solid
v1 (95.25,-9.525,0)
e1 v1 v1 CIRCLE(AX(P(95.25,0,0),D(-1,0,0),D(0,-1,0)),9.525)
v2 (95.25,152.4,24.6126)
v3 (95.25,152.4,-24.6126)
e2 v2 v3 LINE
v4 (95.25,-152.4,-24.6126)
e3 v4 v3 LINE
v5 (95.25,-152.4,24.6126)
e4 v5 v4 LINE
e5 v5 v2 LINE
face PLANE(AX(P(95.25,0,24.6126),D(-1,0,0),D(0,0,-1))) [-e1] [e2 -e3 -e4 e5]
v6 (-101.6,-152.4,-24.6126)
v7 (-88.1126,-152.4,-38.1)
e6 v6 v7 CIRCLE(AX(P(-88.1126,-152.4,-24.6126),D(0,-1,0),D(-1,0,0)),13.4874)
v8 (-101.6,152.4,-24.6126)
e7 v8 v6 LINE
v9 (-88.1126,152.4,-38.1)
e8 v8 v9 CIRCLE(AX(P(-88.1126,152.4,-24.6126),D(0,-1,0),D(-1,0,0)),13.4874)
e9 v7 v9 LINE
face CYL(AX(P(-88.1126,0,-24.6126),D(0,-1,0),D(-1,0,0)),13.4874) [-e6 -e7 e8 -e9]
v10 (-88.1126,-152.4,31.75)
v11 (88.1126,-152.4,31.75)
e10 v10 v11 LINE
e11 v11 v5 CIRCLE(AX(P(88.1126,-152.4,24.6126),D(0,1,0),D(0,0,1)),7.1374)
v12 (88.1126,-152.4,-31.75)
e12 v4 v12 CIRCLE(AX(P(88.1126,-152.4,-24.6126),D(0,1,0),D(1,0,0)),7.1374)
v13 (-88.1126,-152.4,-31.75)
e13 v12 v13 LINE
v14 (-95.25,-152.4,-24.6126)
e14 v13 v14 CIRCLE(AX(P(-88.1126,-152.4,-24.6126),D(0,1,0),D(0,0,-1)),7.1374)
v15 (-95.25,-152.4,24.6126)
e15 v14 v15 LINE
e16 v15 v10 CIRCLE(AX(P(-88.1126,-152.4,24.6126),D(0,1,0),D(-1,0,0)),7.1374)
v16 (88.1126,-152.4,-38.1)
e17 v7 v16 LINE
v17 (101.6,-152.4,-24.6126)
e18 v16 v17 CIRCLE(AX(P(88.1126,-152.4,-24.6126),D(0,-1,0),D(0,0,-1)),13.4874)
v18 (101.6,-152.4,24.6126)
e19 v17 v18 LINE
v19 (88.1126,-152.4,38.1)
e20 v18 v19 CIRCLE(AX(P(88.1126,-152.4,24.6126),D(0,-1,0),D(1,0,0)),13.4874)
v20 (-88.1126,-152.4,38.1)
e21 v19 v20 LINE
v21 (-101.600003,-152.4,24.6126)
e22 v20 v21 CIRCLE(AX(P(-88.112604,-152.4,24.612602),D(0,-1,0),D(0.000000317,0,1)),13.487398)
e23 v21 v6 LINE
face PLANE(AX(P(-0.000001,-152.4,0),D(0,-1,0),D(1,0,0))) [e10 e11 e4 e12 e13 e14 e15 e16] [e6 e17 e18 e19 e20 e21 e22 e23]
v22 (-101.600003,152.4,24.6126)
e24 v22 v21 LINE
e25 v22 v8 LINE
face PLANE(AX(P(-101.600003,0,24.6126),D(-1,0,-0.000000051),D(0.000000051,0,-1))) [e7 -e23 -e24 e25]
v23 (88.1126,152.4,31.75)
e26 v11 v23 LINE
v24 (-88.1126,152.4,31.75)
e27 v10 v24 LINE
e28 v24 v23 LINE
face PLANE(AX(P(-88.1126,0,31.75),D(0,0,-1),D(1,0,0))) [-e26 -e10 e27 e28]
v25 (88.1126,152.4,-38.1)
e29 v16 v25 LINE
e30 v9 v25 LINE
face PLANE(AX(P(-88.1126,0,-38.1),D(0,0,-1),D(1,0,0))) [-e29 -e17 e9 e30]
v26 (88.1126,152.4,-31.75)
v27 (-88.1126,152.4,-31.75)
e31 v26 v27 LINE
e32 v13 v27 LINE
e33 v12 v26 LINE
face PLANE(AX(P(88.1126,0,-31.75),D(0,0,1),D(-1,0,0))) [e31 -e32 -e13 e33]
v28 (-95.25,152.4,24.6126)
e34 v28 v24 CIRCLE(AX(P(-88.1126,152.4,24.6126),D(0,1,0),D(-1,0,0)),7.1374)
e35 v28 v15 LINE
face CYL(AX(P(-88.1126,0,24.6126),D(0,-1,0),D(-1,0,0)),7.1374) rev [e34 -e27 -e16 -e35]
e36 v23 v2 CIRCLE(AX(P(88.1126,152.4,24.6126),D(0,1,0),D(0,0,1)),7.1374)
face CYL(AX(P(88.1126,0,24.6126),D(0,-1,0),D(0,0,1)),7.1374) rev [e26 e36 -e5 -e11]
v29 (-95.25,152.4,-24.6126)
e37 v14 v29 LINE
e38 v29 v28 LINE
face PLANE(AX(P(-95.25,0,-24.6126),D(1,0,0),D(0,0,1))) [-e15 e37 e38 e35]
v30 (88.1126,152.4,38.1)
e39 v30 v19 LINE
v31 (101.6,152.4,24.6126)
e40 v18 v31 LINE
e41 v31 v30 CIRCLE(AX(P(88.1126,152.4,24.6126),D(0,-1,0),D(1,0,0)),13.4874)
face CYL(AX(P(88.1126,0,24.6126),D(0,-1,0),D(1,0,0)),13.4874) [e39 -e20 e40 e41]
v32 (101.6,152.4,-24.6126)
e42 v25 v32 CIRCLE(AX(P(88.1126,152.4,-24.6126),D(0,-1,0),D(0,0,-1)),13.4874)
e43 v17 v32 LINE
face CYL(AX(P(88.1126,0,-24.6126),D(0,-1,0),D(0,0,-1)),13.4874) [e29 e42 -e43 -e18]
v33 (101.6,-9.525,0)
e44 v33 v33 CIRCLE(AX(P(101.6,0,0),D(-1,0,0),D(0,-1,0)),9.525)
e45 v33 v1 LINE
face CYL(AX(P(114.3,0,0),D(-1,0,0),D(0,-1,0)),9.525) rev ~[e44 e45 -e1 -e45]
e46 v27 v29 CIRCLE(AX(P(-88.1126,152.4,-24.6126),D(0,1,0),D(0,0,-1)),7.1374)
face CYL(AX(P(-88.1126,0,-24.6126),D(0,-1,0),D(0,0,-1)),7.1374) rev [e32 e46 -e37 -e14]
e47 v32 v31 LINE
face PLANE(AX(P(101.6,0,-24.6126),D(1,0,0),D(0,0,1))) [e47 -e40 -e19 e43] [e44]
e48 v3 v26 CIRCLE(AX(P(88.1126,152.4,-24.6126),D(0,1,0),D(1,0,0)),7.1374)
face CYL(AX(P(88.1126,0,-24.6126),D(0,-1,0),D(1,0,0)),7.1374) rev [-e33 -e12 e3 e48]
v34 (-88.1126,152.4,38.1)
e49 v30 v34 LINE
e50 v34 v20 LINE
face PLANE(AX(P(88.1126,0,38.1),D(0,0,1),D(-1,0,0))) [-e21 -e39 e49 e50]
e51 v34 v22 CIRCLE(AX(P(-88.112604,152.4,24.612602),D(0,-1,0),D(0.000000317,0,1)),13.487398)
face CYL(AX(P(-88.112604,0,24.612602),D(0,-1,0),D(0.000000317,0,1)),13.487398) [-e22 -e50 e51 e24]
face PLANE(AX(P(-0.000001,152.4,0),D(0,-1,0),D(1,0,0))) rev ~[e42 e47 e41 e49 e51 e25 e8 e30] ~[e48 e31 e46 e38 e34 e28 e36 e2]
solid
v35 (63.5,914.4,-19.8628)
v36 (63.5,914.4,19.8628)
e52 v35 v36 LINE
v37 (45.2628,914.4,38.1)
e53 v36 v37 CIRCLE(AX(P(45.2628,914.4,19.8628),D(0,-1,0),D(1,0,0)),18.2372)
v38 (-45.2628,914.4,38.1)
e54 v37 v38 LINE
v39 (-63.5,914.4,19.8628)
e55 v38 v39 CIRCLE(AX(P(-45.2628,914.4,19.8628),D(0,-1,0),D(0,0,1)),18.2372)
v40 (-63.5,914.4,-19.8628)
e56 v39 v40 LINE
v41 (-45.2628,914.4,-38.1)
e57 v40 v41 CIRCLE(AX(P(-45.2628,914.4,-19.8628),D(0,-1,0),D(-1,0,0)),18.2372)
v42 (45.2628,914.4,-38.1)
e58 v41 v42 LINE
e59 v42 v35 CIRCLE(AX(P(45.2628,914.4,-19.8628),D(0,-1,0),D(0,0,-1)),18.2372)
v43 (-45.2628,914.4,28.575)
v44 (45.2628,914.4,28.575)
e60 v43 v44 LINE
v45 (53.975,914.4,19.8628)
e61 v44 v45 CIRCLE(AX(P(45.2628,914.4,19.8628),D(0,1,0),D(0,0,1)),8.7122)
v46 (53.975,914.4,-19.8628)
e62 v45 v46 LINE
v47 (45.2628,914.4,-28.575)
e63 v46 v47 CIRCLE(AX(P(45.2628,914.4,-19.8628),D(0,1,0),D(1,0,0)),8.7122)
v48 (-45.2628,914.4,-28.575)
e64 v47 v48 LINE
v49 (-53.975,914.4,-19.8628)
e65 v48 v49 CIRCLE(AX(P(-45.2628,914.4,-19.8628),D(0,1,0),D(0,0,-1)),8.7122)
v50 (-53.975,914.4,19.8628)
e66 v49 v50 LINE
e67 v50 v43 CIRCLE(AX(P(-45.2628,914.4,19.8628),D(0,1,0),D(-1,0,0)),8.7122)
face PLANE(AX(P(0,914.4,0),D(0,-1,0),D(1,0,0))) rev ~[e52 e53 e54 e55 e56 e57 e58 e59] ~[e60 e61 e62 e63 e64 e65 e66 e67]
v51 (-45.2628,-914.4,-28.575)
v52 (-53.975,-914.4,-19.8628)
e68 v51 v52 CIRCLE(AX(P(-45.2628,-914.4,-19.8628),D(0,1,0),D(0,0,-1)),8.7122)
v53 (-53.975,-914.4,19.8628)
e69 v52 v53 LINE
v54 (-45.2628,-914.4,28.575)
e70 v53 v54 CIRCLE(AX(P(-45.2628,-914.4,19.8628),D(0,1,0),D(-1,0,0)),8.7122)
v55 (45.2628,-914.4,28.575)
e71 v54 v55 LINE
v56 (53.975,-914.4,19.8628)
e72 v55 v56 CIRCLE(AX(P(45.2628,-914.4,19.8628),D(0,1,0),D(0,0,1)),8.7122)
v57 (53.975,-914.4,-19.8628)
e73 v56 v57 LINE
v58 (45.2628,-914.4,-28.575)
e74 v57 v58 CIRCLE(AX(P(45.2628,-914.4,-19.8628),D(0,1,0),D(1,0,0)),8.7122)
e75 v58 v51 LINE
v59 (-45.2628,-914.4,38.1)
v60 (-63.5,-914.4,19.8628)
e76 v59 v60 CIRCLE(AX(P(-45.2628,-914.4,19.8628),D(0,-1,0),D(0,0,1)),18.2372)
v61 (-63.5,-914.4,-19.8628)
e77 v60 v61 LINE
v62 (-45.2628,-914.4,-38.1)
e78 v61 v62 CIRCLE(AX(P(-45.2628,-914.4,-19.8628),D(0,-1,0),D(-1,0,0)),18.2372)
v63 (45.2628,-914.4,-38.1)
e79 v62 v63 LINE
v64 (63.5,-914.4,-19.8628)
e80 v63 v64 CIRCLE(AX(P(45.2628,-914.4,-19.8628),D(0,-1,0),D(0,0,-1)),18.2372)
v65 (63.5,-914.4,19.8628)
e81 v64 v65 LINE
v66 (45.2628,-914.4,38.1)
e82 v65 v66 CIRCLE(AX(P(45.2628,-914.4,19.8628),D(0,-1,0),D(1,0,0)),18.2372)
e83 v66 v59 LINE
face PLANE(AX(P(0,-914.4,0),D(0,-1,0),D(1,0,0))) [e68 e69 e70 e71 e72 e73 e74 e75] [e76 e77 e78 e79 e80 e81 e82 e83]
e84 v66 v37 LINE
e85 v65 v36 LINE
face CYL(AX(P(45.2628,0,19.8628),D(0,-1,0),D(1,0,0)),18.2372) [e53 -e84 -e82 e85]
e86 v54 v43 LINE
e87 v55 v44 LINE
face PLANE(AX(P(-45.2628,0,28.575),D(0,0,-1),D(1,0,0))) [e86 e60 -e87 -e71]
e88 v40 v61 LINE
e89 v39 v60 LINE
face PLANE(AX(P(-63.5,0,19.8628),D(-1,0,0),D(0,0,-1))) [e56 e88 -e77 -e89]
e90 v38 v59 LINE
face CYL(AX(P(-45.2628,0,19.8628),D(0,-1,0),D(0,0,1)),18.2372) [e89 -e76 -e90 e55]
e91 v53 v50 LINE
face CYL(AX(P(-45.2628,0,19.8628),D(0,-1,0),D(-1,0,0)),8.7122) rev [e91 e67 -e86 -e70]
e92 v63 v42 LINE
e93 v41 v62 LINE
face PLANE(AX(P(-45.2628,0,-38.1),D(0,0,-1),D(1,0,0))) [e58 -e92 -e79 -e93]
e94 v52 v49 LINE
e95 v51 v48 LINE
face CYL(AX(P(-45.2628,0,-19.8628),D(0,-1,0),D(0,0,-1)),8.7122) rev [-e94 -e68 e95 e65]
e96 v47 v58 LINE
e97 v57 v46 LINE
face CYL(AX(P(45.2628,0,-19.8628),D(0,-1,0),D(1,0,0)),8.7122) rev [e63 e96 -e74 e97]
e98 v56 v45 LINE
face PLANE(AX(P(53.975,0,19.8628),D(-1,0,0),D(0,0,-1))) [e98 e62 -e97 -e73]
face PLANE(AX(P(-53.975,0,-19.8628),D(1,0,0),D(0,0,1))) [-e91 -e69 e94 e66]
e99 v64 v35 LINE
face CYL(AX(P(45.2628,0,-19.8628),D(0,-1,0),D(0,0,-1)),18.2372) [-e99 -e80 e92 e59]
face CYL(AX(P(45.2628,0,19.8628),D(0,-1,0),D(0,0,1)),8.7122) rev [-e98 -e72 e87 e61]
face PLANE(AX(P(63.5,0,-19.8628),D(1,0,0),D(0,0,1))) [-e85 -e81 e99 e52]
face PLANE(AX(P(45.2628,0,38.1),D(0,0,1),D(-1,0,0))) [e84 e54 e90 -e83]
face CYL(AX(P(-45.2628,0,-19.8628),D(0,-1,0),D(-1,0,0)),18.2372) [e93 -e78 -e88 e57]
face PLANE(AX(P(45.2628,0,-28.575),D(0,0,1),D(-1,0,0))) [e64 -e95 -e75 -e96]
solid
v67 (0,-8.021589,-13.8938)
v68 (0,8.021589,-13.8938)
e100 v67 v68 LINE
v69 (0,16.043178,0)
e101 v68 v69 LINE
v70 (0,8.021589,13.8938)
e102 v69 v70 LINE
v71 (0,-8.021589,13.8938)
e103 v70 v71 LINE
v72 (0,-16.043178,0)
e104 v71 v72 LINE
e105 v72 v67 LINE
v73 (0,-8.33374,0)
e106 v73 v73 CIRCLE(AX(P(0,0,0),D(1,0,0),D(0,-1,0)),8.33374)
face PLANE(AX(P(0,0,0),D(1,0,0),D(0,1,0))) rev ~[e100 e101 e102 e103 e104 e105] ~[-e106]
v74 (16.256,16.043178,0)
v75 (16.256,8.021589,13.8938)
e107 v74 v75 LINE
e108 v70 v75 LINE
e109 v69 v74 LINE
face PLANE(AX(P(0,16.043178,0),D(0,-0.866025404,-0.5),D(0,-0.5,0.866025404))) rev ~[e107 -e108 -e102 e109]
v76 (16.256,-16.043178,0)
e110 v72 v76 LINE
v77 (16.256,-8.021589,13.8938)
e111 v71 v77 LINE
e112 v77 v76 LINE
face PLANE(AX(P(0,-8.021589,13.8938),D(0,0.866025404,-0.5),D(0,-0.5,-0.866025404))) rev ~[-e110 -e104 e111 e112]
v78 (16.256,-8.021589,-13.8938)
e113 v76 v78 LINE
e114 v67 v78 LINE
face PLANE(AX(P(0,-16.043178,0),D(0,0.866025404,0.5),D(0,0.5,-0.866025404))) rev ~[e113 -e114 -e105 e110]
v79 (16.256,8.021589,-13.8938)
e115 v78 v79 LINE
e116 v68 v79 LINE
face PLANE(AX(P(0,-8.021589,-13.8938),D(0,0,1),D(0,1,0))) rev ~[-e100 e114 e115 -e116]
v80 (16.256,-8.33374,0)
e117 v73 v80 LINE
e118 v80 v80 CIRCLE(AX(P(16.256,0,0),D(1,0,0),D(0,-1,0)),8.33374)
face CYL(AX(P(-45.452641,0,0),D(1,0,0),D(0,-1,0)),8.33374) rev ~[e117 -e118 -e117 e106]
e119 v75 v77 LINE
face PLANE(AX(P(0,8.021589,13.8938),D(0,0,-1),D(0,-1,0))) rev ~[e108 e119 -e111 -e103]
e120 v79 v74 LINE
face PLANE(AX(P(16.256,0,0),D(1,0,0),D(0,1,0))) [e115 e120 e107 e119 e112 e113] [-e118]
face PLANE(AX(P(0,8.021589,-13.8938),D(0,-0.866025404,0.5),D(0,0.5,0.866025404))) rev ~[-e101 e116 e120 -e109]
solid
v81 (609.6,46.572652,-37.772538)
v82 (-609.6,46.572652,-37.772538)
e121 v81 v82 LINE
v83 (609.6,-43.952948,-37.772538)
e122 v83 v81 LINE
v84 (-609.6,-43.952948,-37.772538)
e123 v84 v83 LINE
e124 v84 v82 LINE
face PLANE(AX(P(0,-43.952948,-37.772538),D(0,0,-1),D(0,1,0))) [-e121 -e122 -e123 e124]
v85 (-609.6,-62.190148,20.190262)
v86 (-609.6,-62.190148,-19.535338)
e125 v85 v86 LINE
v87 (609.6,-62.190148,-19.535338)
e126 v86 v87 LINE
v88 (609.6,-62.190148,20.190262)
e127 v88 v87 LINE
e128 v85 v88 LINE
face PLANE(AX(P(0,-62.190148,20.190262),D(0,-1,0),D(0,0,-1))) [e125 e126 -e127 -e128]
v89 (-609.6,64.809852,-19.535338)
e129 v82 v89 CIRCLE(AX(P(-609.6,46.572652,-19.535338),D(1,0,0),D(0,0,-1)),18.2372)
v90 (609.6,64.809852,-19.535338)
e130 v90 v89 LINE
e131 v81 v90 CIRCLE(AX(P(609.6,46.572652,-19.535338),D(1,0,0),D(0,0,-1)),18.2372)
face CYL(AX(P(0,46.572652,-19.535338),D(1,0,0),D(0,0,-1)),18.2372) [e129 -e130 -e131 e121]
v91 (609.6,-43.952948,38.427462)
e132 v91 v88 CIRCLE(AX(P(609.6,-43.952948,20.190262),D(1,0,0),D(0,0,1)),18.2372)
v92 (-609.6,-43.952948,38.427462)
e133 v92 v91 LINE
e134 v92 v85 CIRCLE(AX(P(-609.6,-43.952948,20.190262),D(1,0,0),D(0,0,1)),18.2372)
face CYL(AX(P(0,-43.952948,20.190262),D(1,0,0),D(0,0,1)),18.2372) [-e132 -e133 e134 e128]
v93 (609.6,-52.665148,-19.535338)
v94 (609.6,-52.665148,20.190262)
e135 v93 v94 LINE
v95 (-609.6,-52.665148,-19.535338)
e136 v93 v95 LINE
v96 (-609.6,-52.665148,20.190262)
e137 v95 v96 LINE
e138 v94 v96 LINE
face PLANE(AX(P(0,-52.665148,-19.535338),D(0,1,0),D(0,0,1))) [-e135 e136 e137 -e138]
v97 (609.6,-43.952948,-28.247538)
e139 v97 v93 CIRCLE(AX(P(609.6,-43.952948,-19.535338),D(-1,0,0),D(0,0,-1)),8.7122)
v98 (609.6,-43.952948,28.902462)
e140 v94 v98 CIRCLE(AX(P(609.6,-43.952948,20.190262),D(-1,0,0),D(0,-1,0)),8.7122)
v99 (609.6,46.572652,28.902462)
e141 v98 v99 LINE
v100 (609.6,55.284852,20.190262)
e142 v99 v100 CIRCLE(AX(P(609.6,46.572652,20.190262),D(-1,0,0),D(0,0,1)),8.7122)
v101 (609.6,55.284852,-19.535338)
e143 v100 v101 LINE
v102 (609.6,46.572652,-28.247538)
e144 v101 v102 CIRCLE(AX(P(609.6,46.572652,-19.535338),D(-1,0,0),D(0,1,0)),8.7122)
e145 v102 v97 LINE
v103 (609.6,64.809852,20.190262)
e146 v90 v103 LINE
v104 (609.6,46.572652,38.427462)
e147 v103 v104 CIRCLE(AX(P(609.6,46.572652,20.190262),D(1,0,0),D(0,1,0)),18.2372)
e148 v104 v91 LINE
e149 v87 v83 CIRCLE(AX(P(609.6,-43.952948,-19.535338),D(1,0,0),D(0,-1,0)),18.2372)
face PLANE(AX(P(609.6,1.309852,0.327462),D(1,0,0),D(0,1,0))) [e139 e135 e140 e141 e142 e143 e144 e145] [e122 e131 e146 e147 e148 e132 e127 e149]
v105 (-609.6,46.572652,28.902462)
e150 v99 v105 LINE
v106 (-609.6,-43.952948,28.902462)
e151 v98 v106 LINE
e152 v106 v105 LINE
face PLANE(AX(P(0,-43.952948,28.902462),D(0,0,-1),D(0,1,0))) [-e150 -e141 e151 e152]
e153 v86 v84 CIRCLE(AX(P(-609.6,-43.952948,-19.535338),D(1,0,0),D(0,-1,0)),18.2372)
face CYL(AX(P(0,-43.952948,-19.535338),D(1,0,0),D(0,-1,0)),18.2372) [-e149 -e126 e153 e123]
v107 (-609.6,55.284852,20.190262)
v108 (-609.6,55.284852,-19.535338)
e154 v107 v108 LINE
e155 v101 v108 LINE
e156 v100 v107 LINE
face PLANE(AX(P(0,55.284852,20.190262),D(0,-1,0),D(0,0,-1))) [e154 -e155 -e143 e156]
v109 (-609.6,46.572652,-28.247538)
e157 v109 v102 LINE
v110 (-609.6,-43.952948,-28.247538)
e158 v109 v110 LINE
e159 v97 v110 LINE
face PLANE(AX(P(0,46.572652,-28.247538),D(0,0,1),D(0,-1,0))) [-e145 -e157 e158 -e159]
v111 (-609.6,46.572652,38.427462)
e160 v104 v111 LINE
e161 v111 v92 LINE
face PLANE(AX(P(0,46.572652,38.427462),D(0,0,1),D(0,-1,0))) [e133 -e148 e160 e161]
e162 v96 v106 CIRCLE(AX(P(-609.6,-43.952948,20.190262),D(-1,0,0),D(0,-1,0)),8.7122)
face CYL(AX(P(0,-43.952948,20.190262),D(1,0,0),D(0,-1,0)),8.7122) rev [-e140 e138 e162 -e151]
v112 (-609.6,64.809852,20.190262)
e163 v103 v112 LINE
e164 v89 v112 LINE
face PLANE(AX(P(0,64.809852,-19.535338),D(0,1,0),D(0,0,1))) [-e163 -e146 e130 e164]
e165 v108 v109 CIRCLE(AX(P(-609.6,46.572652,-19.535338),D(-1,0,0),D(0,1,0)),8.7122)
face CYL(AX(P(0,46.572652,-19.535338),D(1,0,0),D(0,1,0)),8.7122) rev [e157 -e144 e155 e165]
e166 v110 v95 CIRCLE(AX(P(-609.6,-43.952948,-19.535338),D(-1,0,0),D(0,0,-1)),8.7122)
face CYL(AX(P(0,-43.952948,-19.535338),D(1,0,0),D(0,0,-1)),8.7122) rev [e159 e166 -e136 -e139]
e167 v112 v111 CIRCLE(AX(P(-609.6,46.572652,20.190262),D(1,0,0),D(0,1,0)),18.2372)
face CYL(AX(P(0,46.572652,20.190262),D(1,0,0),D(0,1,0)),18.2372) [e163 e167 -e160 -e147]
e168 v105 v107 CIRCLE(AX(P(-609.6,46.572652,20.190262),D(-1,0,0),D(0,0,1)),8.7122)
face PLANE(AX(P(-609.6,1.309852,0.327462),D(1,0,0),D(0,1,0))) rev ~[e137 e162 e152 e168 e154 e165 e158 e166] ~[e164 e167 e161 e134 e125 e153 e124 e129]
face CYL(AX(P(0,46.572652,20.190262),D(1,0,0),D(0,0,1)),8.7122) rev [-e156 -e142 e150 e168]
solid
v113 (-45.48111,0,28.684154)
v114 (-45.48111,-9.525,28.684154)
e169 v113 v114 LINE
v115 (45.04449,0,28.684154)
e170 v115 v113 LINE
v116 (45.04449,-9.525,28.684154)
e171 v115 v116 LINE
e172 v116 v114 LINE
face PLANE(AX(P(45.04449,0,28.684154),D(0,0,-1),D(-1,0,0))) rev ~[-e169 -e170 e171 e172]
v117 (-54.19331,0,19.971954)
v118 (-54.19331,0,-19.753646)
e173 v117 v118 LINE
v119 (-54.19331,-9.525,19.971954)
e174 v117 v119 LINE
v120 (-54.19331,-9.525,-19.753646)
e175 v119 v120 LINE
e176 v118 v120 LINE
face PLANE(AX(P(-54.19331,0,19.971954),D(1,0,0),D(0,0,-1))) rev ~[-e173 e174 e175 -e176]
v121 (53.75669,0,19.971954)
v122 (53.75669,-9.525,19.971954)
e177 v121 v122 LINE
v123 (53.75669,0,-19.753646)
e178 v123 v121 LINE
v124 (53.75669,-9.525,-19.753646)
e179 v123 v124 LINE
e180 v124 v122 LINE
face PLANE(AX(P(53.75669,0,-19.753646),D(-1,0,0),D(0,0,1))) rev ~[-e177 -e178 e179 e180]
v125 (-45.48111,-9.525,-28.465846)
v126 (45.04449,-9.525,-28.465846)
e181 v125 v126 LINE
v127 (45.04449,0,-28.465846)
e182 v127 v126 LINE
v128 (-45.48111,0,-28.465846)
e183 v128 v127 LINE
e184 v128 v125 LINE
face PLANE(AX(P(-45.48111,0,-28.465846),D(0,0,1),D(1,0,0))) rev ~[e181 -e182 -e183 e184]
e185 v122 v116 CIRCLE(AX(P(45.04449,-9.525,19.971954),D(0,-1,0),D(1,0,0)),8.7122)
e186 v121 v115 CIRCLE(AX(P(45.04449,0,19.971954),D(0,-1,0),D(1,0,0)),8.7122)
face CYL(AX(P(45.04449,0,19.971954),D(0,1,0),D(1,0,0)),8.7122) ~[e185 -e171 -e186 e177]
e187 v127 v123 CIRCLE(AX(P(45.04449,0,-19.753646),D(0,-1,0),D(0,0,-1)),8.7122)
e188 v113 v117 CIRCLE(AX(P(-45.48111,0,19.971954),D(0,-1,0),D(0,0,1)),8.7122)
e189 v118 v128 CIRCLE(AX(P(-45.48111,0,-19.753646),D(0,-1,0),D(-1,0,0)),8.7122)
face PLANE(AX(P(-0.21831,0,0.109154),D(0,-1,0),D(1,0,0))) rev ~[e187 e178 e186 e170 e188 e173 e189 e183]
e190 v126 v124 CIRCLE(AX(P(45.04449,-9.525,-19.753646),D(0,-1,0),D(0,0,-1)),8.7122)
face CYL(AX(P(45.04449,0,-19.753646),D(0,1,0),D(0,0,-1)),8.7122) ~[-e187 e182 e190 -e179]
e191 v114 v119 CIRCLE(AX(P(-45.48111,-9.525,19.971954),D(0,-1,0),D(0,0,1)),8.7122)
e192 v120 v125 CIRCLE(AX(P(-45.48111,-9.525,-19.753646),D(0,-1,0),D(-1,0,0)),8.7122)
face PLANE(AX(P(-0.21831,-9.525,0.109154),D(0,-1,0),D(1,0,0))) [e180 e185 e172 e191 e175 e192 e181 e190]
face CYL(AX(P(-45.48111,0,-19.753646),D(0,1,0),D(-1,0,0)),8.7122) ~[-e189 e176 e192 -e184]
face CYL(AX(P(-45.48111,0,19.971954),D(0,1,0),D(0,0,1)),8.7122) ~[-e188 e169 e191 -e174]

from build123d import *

# Parameters (mm, degrees)
F1_DEPTH  = 152.4
F3_D      = 19.05
F3_DEPTH  = 12.7
F3_TIP    = 5.7231973962
F5_DEPTH  = 16.256
F6_D      = 16.66748
F8_DEPTH  = 914.4
F10_DEPTH = 609.6
F12_DEPTH = 9.525


# Not quite as in the source:
# - ends of sketch curves that miss each other by under 0.0002 mm in the source are joined


with BuildPart() as f1:
    # F0 (on Front) → F1 (new body, symmetric)
    with BuildSketch(Plane.XZ):
        with BuildLine():
            ThreePointArc((101.6, 24.6126), (97.6496320006, 34.1496320006), (88.1126, 38.1))
            Line((88.1126, 38.1), (-88.1126, 38.1))
            ThreePointArc((-88.1126, 38.1), (-97.6496337703, 34.1496337703), (-101.6000025028, 24.6126))
            Line((-101.6000025028, 24.6126), (-101.6, -24.6126))
            ThreePointArc((-101.6, -24.6126), (-97.6496320006, -34.1496320006), (-88.1126, -38.1))
            Line((-88.1126, -38.1), (88.1126, -38.1))
            ThreePointArc((88.1126, -38.1), (97.6496320006, -34.1496320006), (101.6, -24.6126))
            Line((101.6, -24.6126), (101.6, 24.6126))
        make_face()
        with BuildLine():
            ThreePointArc((-95.25, 24.6126), (-93.15950394, 29.65950394), (-88.1126, 31.75))
            Line((-88.1126, 31.75), (88.1126, 31.75))
            ThreePointArc((88.1126, 31.75), (93.15950394, 29.65950394), (95.25, 24.6126))
            Line((95.25, 24.6126), (95.25, -24.6126))
            ThreePointArc((95.25, -24.6126), (93.15950394, -29.65950394), (88.1126, -31.75))
            Line((88.1126, -31.75), (-88.1126, -31.75))
            ThreePointArc((-88.1126, -31.75), (-93.15950394, -29.65950394), (-95.25, -24.6126))
            Line((-95.25, -24.6126), (-95.25, 24.6126))
        make_face(mode=Mode.SUBTRACT)
    extrude(amount=F1_DEPTH, both=True)

    # F3
    with Locations(Plane.YZ.offset(101.6)):
        with Locations((0, 0)):
            Hole(F3_D / 2, depth=F3_DEPTH)
            with Locations((0, 0, -(F3_DEPTH + F3_TIP / 2))):  # 118° drill point
                Cone(0, F3_D / 2, F3_TIP, mode=Mode.SUBTRACT)


with BuildPart() as f5:
    # F4 (on Right) → F5 (new body)
    with BuildSketch(Plane.YZ):
        Polygon((8.0215891701, 13.8938), (-8.0215891701, 13.8938), (-16.0431783401, 0), (-8.0215891701, -13.8938), (8.0215891701, -13.8938), (16.0431783401, 0), align=None)
    extrude(amount=F5_DEPTH)

    # F6 (through all)
    with Locations(Plane(origin=(0, 0, 0), x_dir=(0, 1, 0), z_dir=(-1, 0, 0))):
        with Locations((0, 0)):
            Hole(F6_D / 2)


with BuildPart() as f8:
    # F7 (on Front) → F8 (new body, symmetric)
    with BuildSketch(Plane.XZ):
        with BuildLine():
            Line((45.2628, 38.1), (-45.2628, 38.1))
            ThreePointArc((-45.2628, 38.1), (-58.1584477899, 32.7584477899), (-63.5, 19.8628))
            Line((-63.5, 19.8628), (-63.5, -19.8628))
            ThreePointArc((-63.5, -19.8628), (-58.1584477899, -32.7584477899), (-45.2628, -38.1))
            Line((-45.2628, -38.1), (45.2628, -38.1))
            ThreePointArc((45.2628, -38.1), (58.1584477899, -32.7584477899), (63.5, -19.8628))
            Line((63.5, -19.8628), (63.5, 19.8628))
            ThreePointArc((63.5, 19.8628), (58.1584477899, 32.7584477899), (45.2628, 38.1))
        make_face()
        with BuildLine():
            Line((45.2628, -28.575), (-45.2628, -28.575))
            ThreePointArc((-45.2628, -28.575), (-51.4232556991, -26.0232556991), (-53.975, -19.8628))
            Line((-53.975, -19.8628), (-53.975, 19.8628))
            ThreePointArc((-53.975, 19.8628), (-51.4232556991, 26.0232556991), (-45.2628, 28.575))
            Line((-45.2628, 28.575), (45.2628, 28.575))
            ThreePointArc((45.2628, 28.575), (51.4232556991, 26.0232556991), (53.975, 19.8628))
            Line((53.975, 19.8628), (53.975, -19.8628))
            ThreePointArc((53.975, -19.8628), (51.4232556991, -26.0232556991), (45.2628, -28.575))
        make_face(mode=Mode.SUBTRACT)
    extrude(amount=F8_DEPTH, both=True)


with BuildPart() as f10:
    # F9 (on Right) → F10 (new body, symmetric)
    with BuildSketch(Plane.YZ):
        with BuildLine():
            Line((46.5726517666, 38.427462476), (-43.9529482334, 38.427462476))
            ThreePointArc((-43.9529482334, 38.427462476), (-56.8485960233, 33.0859102658), (-62.1901482334, 20.190262476))
            Line((-62.1901482334, 20.190262476), (-62.1901482334, -19.535337524))
            ThreePointArc((-62.1901482334, -19.535337524), (-56.8485960233, -32.4309853139), (-43.9529482334, -37.772537524))
            Line((-43.9529482334, -37.772537524), (46.5726517666, -37.772537524))
            ThreePointArc((46.5726517666, -37.772537524), (59.4682995564, -32.4309853139), (64.8098517666, -19.535337524))
            Line((64.8098517666, -19.535337524), (64.8098517666, 20.190262476))
            ThreePointArc((64.8098517666, 20.190262476), (59.4682995564, 33.0859102658), (46.5726517666, 38.427462476))
        make_face()
        with BuildLine():
            Line((46.5726517666, -28.247537524), (-43.9529482334, -28.247537524))
            ThreePointArc((-43.9529482334, -28.247537524), (-50.1134039325, -25.6957932231), (-52.6651482334, -19.535337524))
            Line((-52.6651482334, -19.535337524), (-52.6651482334, 20.190262476))
            ThreePointArc((-52.6651482334, 20.190262476), (-50.1134039325, 26.350718175), (-43.9529482334, 28.902462476))
            Line((-43.9529482334, 28.902462476), (46.5726517666, 28.902462476))
            ThreePointArc((46.5726517666, 28.902462476), (52.7331074656, 26.350718175), (55.2848517666, 20.190262476))
            Line((55.2848517666, 20.190262476), (55.2848517666, -19.535337524))
            ThreePointArc((55.2848517666, -19.535337524), (52.7331074656, -25.6957932231), (46.5726517666, -28.247537524))
        make_face(mode=Mode.SUBTRACT)
    extrude(amount=F10_DEPTH, both=True)


with BuildPart() as f12:
    # F11 (on Front) → F12 (new body)
    with BuildSketch(Plane.XZ):
        with BuildLine():
            ThreePointArc((-54.1933096803, -19.7536458365), (-51.6415653794, -25.9141015355), (-45.4811096803, -28.4658458365))
            Line((-45.4811096803, -28.4658458365), (45.0444903197, -28.4658458365))
            ThreePointArc((45.0444903197, -28.4658458365), (51.2049460187, -25.9141015355), (53.7566903197, -19.7536458365))
            Line((53.7566903197, -19.7536458365), (53.7566903197, 19.9719541635))
            ThreePointArc((53.7566903197, 19.9719541635), (51.2049460187, 26.1324098626), (45.0444903197, 28.6841541635))
            Line((45.0444903197, 28.6841541635), (-45.4811096803, 28.6841541635))
            ThreePointArc((-45.4811096803, 28.6841541635), (-51.6415653794, 26.1324098626), (-54.1933096803, 19.9719541635))
            Line((-54.1933096803, 19.9719541635), (-54.1933096803, -19.7536458365))
        make_face()
    extrude(amount=F12_DEPTH)


solid = Compound([f1.part, f5.part, f8.part, f10.part, f12.part])
